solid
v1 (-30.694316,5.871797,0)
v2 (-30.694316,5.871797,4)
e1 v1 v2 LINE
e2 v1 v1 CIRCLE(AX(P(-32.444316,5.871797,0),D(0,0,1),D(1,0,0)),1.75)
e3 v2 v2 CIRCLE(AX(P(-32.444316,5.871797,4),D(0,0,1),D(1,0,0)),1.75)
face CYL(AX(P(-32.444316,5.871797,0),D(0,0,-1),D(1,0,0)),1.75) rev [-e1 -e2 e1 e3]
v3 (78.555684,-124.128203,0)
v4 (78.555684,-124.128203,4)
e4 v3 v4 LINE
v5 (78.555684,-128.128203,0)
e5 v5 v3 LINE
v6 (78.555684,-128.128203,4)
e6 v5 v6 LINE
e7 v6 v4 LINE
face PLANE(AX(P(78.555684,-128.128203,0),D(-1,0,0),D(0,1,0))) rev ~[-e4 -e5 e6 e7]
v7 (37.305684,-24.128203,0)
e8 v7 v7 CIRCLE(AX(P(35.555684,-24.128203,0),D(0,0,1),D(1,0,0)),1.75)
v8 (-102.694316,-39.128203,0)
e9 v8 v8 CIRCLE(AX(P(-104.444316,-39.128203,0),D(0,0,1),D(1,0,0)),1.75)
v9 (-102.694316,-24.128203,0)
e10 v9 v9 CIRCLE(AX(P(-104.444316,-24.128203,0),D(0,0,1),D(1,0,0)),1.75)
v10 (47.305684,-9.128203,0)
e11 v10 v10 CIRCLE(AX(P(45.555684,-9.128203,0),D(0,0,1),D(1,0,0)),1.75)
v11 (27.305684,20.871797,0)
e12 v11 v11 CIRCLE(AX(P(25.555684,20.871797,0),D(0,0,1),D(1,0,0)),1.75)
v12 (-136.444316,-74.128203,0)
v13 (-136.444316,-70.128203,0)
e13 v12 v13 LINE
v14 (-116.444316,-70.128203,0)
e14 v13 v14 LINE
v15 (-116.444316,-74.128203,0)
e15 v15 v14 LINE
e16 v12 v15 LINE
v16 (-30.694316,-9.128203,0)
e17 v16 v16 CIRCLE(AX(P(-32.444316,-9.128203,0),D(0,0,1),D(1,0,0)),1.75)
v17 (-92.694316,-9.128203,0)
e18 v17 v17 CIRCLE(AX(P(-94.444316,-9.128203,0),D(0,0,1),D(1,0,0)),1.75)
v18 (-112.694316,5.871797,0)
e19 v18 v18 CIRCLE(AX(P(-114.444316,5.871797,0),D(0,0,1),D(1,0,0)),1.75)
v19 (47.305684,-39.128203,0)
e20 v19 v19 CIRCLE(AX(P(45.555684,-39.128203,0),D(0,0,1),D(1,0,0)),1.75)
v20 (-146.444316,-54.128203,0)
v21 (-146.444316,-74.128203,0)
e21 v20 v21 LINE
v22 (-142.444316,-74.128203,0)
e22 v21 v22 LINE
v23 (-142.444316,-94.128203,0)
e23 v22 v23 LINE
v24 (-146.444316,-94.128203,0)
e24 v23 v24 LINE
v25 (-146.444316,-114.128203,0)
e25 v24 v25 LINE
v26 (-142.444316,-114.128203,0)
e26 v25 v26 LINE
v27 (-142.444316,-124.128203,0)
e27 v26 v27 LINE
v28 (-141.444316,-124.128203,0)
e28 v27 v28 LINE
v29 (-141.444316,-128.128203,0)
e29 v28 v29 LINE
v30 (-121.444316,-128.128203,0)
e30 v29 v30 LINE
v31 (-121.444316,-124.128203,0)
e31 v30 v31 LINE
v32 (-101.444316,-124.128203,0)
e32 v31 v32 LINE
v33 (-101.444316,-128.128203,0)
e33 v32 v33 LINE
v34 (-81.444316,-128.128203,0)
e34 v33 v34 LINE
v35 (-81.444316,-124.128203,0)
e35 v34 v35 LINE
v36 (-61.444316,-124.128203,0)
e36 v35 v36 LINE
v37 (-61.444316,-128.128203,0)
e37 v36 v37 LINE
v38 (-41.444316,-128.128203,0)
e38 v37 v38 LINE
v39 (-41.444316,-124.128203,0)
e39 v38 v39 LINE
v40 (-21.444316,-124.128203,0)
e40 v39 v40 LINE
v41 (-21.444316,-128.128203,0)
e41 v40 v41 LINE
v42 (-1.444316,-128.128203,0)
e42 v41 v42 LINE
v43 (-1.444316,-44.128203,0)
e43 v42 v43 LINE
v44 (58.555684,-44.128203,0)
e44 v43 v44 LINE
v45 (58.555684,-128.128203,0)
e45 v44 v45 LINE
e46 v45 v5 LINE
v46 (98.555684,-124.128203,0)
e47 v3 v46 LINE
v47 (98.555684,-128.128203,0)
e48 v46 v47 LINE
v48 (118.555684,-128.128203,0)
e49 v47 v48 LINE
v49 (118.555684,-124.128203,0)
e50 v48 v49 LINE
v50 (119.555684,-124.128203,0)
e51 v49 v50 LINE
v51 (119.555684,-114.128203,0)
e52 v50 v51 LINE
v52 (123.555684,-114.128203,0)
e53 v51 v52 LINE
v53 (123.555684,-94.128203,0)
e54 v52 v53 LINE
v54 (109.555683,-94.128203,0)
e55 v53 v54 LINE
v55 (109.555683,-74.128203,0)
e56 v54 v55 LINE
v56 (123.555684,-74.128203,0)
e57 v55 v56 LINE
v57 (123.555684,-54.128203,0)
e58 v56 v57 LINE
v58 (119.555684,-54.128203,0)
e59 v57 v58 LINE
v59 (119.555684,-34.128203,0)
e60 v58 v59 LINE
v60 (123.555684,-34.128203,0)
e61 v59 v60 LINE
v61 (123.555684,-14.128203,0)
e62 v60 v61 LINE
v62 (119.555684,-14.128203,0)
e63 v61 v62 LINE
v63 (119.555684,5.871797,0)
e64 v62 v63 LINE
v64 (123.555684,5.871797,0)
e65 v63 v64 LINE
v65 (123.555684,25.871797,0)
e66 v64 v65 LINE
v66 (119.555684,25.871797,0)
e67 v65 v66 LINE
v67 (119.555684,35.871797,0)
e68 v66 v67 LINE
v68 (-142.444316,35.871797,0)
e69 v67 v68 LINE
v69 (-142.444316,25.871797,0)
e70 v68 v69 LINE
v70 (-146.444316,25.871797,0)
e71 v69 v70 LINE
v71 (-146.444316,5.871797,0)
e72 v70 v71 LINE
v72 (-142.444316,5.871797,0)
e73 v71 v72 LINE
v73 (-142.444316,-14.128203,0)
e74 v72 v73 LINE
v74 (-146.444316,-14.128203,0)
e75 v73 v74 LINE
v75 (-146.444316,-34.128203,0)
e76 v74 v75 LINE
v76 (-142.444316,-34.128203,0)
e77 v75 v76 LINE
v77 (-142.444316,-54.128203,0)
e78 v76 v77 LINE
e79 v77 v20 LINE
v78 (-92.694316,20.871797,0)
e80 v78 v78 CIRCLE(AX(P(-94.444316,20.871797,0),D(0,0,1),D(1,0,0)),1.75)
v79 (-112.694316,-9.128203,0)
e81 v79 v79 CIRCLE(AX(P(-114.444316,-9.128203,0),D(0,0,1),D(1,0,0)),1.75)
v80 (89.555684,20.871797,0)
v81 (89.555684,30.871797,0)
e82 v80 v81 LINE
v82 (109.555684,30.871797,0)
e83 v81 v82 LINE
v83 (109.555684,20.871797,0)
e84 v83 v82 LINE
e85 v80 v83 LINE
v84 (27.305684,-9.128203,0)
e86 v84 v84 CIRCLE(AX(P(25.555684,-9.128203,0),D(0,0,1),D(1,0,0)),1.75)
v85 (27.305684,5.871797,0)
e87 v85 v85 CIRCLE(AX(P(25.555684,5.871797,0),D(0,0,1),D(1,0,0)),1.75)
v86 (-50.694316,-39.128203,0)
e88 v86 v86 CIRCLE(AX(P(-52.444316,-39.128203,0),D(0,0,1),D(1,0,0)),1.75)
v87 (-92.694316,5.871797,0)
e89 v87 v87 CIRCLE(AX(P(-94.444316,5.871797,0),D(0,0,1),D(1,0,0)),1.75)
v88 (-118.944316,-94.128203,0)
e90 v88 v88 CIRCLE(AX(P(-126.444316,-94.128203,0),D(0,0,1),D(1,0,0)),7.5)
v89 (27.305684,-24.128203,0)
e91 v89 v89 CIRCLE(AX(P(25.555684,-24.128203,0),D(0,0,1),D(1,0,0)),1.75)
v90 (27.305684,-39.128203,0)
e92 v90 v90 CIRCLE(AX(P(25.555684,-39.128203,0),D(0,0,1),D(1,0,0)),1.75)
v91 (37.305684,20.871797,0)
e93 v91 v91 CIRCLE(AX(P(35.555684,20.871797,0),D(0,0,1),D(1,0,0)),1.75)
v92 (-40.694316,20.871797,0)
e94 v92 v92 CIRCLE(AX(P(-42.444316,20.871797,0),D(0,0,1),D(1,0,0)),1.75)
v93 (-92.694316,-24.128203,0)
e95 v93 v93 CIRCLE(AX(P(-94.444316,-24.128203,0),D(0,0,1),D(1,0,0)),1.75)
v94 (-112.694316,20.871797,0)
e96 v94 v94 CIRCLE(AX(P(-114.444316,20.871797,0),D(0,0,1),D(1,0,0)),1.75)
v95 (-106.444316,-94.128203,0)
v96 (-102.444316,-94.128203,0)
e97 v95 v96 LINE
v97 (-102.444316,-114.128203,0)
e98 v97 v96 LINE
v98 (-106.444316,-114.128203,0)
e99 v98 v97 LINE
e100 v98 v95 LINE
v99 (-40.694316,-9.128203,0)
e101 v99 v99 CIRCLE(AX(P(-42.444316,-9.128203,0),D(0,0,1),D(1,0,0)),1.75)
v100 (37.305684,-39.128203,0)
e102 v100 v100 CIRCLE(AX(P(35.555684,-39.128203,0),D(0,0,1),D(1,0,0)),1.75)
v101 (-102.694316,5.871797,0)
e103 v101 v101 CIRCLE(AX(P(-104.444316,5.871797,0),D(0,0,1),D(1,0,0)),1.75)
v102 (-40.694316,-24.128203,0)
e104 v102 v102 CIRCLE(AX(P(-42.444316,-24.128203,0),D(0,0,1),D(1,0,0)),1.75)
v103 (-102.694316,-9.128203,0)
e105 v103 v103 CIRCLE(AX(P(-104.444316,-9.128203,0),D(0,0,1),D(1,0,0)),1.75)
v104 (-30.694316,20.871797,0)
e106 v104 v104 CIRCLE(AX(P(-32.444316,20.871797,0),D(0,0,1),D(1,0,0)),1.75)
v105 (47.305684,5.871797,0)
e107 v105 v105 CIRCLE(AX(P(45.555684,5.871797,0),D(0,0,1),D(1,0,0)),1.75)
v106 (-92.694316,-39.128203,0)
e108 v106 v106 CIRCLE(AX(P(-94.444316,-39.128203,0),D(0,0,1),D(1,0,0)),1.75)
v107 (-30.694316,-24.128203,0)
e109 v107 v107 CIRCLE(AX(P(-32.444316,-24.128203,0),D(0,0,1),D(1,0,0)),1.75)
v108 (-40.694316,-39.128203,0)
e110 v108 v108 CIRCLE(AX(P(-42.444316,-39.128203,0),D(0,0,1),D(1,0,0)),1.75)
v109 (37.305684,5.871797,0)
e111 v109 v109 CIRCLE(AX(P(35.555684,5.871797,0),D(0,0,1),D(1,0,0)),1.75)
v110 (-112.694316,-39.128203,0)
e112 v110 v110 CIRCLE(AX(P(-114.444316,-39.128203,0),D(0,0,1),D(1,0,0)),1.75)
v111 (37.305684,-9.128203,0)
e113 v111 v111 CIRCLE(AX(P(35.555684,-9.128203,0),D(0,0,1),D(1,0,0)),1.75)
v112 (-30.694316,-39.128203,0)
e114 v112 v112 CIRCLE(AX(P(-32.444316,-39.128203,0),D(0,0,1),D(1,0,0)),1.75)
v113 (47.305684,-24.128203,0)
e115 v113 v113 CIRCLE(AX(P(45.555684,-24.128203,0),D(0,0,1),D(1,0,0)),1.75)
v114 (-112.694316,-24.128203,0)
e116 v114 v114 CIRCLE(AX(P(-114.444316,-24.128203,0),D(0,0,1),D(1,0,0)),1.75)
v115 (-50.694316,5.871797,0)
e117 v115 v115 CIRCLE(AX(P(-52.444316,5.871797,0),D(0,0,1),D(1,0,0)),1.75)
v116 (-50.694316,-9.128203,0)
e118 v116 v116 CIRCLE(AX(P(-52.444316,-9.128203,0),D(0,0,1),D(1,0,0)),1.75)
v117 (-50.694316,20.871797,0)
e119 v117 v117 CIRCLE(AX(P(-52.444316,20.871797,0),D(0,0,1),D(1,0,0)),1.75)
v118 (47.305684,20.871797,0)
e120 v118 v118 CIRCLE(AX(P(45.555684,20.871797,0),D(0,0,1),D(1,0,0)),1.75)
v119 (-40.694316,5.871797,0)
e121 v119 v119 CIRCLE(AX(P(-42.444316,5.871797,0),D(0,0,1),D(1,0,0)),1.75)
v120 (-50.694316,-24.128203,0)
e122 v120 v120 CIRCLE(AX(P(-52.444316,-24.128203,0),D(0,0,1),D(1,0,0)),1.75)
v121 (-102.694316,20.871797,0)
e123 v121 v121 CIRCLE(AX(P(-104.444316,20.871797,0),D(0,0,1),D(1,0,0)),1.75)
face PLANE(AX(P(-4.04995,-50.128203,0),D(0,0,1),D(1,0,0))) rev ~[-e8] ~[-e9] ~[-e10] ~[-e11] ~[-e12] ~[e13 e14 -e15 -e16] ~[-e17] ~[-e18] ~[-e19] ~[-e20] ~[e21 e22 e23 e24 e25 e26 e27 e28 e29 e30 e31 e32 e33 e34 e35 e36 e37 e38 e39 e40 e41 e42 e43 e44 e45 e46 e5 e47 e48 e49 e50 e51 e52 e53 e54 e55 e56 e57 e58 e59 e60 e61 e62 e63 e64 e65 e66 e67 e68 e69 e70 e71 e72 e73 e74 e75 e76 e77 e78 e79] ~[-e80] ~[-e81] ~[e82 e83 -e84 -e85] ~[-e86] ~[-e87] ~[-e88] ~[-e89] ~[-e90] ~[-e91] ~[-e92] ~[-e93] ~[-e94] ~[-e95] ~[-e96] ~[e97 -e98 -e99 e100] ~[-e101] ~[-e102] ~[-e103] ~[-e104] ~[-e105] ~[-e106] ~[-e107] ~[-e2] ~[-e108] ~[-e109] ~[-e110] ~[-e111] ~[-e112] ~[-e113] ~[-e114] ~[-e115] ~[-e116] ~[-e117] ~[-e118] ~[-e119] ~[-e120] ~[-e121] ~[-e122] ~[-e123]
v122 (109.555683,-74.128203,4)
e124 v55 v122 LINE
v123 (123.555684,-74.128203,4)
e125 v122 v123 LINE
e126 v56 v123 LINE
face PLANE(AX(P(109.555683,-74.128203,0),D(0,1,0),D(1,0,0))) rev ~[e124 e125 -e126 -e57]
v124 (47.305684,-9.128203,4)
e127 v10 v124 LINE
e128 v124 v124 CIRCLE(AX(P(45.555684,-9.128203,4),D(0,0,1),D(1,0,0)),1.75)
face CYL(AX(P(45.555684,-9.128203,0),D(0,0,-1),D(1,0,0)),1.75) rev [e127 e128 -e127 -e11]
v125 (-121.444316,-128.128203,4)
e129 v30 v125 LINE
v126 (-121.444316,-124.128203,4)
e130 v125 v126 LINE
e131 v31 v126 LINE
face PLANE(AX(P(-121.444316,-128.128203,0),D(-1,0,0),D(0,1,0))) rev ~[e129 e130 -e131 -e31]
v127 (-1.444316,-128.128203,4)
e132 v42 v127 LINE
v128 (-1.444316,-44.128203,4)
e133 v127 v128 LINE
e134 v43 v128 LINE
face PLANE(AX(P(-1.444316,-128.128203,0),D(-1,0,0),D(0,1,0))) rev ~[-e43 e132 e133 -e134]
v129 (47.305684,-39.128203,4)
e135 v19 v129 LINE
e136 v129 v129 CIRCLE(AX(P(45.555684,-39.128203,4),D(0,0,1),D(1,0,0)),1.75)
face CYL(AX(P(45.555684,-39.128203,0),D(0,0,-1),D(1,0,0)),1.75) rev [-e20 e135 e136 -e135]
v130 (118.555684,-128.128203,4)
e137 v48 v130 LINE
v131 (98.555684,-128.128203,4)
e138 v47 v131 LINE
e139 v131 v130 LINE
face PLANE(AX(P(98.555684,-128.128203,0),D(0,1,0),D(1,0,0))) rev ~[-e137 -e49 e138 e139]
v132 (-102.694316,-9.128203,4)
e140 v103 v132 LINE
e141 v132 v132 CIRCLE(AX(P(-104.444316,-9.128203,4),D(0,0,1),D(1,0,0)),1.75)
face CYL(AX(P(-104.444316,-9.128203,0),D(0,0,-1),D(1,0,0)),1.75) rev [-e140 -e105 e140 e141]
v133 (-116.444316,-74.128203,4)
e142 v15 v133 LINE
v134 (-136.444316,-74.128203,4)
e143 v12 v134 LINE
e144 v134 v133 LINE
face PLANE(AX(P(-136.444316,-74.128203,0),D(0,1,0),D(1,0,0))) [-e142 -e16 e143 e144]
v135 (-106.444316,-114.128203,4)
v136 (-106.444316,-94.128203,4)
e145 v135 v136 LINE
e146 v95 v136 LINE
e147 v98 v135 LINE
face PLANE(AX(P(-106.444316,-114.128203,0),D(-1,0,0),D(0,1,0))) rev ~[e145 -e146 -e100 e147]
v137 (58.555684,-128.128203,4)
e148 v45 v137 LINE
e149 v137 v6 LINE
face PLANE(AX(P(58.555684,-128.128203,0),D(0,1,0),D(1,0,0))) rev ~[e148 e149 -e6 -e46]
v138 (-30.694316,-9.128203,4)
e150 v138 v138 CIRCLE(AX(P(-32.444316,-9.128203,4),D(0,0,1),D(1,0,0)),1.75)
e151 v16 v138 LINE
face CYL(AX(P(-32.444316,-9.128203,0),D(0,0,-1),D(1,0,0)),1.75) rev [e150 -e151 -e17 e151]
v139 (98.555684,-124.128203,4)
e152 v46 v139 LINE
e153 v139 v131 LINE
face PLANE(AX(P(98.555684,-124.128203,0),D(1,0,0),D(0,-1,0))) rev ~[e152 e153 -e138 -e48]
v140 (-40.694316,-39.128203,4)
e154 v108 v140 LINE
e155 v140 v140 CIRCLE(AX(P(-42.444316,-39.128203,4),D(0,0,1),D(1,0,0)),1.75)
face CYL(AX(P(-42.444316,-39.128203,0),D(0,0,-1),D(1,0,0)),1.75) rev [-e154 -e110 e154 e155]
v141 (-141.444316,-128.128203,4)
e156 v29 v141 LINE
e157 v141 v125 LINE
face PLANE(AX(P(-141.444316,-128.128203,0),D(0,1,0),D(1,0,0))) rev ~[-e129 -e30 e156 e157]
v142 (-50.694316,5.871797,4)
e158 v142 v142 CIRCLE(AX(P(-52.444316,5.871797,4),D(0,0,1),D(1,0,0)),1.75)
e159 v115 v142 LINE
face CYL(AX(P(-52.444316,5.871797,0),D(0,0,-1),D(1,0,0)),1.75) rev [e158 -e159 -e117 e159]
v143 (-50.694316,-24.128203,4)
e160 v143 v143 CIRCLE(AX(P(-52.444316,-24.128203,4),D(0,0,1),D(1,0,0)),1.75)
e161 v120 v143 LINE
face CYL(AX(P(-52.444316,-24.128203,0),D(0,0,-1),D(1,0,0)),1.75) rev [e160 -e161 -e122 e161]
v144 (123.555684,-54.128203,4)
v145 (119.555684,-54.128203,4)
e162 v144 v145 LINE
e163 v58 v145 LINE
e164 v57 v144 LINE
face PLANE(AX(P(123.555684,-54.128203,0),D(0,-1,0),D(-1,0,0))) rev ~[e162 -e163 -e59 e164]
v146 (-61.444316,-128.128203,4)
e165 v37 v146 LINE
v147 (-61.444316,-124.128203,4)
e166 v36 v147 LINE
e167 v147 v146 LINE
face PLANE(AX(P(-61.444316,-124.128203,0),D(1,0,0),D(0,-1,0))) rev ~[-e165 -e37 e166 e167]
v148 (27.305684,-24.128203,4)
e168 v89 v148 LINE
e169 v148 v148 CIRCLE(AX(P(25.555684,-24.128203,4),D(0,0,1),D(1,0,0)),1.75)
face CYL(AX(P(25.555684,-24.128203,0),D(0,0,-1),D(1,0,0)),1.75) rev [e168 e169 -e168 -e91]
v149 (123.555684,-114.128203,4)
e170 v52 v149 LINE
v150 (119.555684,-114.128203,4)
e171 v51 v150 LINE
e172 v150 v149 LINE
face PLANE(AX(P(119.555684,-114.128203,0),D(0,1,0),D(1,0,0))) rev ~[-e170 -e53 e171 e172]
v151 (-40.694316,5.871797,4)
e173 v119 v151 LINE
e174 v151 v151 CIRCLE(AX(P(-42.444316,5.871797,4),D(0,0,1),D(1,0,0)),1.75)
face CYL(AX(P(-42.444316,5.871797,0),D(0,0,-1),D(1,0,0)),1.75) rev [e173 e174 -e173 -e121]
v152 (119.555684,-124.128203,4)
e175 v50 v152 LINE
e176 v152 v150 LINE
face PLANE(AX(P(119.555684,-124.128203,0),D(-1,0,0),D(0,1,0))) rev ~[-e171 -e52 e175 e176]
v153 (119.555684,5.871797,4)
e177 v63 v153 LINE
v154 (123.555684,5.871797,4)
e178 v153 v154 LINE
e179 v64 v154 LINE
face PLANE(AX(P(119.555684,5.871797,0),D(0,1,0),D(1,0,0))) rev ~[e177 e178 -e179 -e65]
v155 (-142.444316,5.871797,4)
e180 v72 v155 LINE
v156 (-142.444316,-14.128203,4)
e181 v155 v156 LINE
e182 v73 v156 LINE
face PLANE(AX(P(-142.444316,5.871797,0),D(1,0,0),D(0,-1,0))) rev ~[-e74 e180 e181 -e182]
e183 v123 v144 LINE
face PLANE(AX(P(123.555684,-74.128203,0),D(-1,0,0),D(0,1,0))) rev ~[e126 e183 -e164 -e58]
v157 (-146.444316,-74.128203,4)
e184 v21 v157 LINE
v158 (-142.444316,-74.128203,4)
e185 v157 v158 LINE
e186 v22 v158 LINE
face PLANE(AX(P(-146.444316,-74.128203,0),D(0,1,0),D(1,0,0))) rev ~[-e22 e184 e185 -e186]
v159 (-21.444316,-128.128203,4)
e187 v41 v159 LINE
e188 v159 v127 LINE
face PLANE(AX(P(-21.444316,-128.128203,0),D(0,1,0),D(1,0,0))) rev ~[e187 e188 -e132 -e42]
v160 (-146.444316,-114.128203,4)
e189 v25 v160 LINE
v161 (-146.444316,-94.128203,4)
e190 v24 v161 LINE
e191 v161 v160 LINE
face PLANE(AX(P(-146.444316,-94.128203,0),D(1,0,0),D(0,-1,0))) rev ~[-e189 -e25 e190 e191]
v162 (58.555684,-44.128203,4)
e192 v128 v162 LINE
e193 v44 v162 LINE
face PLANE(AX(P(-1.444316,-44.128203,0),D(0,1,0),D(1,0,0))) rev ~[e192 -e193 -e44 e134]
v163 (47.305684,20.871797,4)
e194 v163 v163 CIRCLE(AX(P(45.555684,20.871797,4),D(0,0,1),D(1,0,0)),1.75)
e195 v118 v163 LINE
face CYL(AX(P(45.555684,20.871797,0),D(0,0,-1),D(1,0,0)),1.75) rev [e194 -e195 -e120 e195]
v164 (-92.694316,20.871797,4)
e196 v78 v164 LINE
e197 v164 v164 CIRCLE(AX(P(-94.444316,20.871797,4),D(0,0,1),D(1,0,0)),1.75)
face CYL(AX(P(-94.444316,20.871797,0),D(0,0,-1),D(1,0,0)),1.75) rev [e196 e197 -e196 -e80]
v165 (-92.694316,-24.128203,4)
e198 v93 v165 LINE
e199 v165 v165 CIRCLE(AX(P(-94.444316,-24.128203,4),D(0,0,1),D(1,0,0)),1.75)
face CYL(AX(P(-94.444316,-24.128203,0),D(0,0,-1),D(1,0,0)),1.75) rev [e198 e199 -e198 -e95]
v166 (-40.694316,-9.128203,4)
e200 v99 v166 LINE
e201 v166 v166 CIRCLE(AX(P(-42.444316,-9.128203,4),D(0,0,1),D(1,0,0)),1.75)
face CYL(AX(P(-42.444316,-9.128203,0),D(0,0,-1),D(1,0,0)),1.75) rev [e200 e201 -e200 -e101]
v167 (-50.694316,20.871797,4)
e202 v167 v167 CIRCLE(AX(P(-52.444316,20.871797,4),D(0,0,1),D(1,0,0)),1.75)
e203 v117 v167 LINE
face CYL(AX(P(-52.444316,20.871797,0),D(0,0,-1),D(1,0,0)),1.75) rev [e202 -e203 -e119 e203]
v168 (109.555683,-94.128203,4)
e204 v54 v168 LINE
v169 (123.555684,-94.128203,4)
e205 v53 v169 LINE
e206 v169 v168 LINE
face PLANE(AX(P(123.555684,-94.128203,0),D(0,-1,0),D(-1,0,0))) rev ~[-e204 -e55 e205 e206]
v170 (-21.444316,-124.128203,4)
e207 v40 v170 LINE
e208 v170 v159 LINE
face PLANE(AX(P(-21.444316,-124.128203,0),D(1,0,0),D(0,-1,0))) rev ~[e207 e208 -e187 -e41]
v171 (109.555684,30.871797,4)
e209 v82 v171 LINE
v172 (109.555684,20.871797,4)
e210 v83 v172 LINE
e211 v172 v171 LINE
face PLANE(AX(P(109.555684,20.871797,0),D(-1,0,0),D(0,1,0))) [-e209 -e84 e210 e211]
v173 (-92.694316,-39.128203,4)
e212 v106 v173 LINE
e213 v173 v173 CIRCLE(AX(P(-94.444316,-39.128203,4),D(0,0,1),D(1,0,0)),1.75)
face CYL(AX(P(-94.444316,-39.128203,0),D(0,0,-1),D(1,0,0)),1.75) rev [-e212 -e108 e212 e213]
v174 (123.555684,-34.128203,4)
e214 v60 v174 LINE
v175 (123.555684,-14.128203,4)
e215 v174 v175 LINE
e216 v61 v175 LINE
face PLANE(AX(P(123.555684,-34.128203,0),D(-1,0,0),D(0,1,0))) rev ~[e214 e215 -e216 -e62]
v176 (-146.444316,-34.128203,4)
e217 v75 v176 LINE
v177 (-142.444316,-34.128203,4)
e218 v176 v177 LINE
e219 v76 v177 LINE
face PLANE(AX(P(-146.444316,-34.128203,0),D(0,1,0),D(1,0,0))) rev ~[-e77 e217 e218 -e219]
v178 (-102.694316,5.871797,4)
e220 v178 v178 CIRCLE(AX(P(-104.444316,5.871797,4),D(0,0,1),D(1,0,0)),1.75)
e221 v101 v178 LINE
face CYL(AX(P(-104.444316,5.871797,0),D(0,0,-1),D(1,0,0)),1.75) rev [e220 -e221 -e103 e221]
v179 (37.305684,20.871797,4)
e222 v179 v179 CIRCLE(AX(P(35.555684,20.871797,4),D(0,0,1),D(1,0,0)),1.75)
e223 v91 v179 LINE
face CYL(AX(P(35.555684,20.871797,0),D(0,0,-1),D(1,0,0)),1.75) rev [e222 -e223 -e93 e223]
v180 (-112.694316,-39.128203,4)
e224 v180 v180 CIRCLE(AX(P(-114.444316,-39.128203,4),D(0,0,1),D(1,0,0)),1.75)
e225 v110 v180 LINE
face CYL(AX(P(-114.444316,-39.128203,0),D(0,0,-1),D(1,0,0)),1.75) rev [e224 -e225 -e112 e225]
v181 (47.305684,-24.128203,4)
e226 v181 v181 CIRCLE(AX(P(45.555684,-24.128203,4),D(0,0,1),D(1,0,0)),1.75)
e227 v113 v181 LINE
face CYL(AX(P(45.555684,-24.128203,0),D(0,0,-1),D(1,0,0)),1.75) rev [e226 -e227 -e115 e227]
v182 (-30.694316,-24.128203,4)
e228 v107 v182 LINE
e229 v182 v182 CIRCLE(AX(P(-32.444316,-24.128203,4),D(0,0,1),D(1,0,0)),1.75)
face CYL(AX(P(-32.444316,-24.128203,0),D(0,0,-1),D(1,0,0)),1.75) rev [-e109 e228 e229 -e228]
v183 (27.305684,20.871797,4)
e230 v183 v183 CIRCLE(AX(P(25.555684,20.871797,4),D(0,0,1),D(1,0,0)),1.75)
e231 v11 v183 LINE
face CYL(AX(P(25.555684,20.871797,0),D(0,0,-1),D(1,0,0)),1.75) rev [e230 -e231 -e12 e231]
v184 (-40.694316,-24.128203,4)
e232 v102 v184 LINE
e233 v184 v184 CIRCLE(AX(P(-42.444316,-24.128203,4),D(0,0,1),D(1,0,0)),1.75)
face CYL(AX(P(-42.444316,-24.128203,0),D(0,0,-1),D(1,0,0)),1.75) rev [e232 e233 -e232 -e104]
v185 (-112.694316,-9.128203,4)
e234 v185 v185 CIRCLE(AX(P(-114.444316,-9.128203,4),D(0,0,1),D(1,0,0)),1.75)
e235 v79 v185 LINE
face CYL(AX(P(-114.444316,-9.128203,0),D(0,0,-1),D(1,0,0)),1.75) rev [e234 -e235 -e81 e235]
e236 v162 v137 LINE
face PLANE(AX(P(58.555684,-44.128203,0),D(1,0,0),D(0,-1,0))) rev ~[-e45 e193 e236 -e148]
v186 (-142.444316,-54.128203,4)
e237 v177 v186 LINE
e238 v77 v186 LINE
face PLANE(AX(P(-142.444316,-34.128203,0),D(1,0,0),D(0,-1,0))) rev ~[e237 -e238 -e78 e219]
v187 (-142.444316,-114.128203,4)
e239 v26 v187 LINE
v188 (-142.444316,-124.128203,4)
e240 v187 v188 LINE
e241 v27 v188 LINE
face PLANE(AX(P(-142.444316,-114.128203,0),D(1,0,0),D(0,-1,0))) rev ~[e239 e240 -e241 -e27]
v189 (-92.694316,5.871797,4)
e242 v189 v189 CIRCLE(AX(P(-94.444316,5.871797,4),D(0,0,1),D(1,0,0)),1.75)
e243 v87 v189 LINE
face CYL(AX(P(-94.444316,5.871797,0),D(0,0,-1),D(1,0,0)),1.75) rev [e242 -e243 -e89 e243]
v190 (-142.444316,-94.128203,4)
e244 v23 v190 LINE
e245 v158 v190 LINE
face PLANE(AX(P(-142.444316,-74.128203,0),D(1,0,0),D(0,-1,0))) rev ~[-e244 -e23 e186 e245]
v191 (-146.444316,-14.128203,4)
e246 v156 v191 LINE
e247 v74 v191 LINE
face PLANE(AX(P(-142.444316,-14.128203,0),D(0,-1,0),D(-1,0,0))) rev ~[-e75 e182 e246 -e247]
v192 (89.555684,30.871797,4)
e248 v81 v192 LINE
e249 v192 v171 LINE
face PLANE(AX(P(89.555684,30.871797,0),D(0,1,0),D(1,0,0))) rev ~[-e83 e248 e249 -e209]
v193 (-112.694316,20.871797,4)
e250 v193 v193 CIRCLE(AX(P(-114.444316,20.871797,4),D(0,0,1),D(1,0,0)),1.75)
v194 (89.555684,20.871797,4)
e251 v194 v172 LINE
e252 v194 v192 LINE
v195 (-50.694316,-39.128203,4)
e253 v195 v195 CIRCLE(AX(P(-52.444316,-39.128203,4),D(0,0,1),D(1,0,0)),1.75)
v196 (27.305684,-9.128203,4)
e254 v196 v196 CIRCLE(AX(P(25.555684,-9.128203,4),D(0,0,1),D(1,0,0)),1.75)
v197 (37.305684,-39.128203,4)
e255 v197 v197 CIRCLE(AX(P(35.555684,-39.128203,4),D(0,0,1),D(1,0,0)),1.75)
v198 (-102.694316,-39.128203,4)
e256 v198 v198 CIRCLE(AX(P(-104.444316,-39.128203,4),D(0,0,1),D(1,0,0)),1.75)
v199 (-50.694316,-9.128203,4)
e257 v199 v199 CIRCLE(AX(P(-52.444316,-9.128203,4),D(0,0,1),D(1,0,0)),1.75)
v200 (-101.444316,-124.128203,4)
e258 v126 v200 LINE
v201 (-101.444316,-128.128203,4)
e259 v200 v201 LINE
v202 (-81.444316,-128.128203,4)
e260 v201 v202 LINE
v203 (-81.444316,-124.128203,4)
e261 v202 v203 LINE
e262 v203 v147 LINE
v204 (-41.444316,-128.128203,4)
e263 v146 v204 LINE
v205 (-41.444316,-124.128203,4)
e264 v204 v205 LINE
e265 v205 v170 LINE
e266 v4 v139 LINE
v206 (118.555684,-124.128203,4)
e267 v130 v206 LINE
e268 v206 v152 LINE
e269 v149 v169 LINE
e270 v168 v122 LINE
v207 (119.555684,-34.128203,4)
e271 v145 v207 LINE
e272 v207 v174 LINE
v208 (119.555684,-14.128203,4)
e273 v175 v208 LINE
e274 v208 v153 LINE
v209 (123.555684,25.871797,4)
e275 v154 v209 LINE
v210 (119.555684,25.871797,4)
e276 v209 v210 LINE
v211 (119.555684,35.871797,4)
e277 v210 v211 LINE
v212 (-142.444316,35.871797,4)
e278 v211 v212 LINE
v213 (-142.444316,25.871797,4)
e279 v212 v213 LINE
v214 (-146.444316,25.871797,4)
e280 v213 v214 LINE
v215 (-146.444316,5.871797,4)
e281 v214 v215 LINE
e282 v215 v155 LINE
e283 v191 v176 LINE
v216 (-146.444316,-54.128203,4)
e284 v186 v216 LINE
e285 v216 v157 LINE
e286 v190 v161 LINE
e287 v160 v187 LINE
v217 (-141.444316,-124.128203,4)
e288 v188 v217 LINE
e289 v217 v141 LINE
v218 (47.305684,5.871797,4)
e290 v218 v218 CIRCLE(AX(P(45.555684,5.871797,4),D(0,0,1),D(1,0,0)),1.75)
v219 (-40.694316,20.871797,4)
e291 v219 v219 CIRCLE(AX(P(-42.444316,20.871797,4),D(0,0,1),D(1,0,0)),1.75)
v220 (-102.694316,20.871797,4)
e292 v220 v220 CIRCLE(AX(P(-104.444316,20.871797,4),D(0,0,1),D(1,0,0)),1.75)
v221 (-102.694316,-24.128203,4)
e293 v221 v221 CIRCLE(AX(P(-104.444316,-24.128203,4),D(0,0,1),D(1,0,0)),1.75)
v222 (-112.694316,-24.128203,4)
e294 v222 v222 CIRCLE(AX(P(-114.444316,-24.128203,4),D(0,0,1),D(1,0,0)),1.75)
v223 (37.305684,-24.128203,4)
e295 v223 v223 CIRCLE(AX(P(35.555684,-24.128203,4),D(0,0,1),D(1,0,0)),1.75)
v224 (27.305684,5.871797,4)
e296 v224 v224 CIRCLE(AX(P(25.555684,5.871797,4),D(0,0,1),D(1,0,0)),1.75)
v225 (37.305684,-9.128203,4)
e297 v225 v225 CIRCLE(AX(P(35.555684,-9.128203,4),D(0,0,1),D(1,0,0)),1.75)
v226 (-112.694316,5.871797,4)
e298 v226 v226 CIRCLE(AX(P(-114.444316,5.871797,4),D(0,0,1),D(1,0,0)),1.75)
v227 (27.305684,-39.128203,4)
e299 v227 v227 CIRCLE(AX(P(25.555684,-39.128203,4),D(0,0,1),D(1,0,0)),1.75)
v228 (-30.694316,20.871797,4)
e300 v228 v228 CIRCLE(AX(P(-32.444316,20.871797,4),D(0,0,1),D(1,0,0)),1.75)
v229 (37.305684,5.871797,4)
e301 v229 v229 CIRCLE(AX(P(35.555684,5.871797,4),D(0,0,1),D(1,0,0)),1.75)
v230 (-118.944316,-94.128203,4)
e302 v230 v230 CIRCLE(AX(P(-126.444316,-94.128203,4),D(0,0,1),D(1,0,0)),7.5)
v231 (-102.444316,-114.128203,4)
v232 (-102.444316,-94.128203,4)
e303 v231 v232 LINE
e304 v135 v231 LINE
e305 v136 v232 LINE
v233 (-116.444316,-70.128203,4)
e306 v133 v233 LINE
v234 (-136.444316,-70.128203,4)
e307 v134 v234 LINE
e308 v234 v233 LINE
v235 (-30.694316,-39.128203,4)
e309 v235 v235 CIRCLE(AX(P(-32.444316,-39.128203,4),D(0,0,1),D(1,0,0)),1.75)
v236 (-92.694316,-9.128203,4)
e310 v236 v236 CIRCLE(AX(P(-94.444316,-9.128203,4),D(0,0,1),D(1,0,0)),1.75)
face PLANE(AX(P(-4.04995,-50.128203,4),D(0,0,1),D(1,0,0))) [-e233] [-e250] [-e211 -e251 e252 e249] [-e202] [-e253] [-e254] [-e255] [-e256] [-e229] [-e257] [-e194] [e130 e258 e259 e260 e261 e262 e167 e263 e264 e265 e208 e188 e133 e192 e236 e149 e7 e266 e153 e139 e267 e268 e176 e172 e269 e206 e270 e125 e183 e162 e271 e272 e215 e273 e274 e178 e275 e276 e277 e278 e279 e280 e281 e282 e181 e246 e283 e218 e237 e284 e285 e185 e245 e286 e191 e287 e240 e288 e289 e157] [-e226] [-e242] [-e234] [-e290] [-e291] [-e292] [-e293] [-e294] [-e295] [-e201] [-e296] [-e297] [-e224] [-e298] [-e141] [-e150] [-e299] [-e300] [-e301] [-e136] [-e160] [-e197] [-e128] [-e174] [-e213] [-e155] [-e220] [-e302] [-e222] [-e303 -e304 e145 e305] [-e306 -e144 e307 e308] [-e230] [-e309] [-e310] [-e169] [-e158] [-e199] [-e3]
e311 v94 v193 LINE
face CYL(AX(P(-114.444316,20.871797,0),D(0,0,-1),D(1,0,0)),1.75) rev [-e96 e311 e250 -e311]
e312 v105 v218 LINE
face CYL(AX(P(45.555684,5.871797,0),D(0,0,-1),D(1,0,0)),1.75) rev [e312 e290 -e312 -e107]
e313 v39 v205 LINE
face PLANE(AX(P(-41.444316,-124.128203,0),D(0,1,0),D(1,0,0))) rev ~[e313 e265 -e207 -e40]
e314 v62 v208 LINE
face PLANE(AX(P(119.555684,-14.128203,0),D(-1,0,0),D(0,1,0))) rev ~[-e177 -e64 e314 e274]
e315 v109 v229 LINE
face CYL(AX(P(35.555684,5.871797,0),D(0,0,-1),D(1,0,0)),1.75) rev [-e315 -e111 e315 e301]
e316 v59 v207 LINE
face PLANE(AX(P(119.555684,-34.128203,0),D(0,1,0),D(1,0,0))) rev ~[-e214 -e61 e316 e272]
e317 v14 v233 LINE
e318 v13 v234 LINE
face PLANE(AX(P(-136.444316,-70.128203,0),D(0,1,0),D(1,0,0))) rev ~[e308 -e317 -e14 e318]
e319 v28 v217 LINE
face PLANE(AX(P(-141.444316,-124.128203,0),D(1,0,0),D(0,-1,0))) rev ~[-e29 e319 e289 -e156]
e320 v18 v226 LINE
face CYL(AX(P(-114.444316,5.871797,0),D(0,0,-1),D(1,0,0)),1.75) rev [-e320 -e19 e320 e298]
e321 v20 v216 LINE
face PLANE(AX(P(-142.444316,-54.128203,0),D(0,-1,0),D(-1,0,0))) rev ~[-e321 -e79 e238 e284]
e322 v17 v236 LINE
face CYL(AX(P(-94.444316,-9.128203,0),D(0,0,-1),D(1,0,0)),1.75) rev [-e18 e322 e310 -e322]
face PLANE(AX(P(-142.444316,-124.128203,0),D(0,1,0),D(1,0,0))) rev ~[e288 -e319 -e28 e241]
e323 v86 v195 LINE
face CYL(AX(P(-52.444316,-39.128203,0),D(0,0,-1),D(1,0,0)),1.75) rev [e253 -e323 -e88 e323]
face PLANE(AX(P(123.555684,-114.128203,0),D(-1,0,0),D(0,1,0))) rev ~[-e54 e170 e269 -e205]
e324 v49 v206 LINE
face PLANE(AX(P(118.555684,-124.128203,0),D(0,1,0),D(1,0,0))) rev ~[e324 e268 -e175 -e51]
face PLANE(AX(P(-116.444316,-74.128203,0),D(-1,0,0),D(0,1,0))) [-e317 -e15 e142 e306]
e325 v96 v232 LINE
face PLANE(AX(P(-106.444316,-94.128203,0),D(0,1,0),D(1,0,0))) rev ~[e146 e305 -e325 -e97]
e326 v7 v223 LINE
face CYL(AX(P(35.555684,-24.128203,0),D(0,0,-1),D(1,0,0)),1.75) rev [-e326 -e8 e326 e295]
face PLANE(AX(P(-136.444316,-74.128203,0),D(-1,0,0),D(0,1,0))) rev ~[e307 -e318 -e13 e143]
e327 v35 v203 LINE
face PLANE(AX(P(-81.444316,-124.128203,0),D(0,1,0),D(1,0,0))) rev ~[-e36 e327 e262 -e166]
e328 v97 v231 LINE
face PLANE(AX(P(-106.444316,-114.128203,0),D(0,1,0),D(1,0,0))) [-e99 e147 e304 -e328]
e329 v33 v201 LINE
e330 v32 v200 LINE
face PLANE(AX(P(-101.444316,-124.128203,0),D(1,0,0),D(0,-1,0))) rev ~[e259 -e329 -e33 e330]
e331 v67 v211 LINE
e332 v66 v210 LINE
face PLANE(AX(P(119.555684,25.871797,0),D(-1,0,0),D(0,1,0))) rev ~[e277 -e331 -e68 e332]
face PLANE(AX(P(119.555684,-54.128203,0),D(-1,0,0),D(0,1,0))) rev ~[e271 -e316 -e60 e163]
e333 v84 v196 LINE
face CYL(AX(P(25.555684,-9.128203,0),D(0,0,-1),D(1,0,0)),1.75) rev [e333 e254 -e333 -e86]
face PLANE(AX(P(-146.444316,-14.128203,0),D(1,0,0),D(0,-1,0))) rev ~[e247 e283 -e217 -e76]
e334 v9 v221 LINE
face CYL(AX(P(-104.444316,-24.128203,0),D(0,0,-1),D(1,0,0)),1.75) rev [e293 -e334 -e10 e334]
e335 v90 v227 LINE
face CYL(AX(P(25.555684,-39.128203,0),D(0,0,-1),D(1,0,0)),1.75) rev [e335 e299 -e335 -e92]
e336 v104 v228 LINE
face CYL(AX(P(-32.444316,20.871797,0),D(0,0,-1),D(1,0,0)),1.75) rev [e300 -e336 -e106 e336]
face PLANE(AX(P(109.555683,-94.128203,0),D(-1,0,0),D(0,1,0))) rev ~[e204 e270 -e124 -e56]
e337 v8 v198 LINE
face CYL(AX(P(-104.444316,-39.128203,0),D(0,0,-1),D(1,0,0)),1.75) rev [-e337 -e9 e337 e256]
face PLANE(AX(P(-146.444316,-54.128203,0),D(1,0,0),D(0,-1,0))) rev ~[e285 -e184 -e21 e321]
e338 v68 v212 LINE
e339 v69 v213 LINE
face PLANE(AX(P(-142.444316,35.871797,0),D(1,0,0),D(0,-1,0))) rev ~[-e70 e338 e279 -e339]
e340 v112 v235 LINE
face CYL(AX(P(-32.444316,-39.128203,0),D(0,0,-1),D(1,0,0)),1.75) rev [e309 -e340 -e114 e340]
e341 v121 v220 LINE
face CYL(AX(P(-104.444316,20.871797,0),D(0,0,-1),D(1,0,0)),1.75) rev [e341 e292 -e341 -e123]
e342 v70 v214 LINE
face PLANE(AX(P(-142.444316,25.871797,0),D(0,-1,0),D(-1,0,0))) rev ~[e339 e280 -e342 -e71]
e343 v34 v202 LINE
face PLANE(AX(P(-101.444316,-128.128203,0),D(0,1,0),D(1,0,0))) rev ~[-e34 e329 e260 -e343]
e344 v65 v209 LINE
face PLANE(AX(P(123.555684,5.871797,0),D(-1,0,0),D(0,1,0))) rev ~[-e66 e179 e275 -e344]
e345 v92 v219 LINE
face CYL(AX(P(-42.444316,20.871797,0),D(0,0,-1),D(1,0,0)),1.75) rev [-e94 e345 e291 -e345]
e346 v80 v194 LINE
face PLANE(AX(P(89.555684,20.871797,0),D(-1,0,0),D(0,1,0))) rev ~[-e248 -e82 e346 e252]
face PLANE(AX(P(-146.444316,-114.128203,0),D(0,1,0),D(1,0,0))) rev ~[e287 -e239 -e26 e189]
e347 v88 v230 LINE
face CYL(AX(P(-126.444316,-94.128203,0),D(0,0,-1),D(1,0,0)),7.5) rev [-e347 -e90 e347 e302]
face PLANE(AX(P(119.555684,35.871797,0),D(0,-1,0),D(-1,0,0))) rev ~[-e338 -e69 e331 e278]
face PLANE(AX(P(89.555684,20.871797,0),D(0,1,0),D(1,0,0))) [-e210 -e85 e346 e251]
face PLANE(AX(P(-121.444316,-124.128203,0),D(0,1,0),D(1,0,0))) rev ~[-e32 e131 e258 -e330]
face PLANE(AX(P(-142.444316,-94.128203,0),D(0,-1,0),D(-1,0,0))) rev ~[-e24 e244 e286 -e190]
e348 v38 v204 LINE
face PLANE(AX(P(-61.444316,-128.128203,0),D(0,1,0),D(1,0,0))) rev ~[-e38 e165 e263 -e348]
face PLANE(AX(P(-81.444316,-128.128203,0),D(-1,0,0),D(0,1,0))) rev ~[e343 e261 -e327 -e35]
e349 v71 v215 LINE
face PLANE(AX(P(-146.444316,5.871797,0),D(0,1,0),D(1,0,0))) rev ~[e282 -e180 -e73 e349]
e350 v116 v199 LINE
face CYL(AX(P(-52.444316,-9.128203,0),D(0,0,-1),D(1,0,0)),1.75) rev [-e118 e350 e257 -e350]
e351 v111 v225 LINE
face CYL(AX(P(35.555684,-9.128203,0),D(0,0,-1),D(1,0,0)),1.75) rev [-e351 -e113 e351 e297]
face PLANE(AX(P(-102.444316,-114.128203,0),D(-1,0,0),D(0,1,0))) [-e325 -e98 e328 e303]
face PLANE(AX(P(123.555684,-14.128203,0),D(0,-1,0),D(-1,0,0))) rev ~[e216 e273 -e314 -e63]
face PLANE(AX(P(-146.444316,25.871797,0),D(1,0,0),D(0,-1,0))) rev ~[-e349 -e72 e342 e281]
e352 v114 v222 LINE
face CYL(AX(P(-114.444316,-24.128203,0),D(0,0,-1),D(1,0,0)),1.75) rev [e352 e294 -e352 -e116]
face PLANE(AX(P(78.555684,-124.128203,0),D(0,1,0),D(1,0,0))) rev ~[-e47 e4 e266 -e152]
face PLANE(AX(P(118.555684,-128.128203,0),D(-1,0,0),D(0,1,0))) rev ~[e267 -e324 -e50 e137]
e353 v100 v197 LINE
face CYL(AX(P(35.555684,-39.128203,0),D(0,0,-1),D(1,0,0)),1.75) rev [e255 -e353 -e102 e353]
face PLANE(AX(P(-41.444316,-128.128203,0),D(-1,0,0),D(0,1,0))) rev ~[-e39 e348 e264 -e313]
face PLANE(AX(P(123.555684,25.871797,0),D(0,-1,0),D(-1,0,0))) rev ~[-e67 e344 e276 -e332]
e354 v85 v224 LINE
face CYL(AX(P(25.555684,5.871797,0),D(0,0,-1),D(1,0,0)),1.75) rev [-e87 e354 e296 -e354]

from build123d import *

# Parameters (mm, degrees)
F0_R     = 7.5
F0_W     = 4
F0_H     = 20
F0_W_2   = 20
F0_H_2   = 4
F0_R_2   = 1.75
F0_H_3   = 10
F1_DEPTH = 4


# Not quite as in the source:
# - ends of sketch curves that miss each other by under 0.0002 mm in the source are joined


with BuildPart() as f1:
    # F0 (on Top) → F1 (new body)
    with BuildSketch(Plane.XY):
        Polygon((-21.444316276, -128.1282028952), (-1.444316276, -128.1282028952), (-1.444316276, -124.1282028952), (-1.444316276, -44.1282028952), (58.555683724, -44.1282028952), (58.555683724, -124.1282028952), (58.555683724, -128.1282028952), (78.555683724, -128.1282028952), (78.555683724, -124.1282028952), (98.555683724, -124.1282028952), (98.555683724, -128.1282028952), (118.555683724, -128.1282028952), (118.555683724, -124.1282028952), (119.555683724, -124.1282028952), (119.555683724, -114.1282028952), (123.555683724, -114.1282028952), (123.5556837228, -94.1282028952), (119.5556837228, -94.1282028952), (109.5556834554, -94.1282028952), (109.5556834554, -74.1282028952), (119.5556834554, -74.1282028952), (123.555683724, -74.1282028952), (123.5556837228, -54.1282028952), (119.5556837228, -54.1282028952), (119.5556837242, -34.1282028952), (123.555683724, -34.1282028952), (123.5556837228, -14.1282028952), (119.5556837228, -14.1282028952), (119.5556837242, 5.8717971048), (123.555683724, 5.8717971048), (123.5556837228, 25.8717971048), (119.5556837228, 25.8717971048), (119.555683724, 35.8717971048), (-142.444316276, 35.8717971048), (-142.4443162747, 25.8717971048), (-146.4443162747, 25.8717971048), (-146.444316276, 5.8717971048), (-142.444316276, 5.8717971048), (-142.4443162747, -14.1282028952), (-146.4443162747, -14.1282028952), (-146.444316276, -34.1282028952), (-142.444316276, -34.1282028952), (-142.4443162747, -54.1282028952), (-146.4443162747, -54.1282028952), (-146.444316276, -74.1282028952), (-142.444316276, -74.1282028952), (-142.4443162747, -94.1282028952), (-146.4443162747, -94.1282028952), (-146.444316276, -114.1282028952), (-142.444316276, -114.1282028952), (-142.444316276, -124.1282028952), (-141.444316276, -124.1282028952), (-141.444316276, -128.1282028952), (-121.444316276, -128.1282028952), (-121.444316276, -124.1282028952), (-101.444316276, -124.1282028952), (-101.444316276, -128.1282028952), (-81.444316276, -128.1282028952), (-81.444316276, -124.1282028952), (-61.444316276, -124.1282028952), (-61.444316276, -128.1282028952), (-41.444316276, -128.1282028952), (-41.444316276, -124.1282028952), (-21.444316276, -124.1282028952), align=None)
        with Locations((-126.4443162747, -94.1282028952)):
            Circle(F0_R, mode=Mode.SUBTRACT)
        with Locations((-104.4443162747, -104.1282028952)):
            Rectangle(F0_W, F0_H, mode=Mode.SUBTRACT)
        with Locations((-126.4443162747, -72.1282028948)):
            Rectangle(F0_W_2, F0_H_2, mode=Mode.SUBTRACT)
        with Locations((-114.444316276, -39.1282028952)):
            Circle(F0_R_2, mode=Mode.SUBTRACT)
        with Locations((-104.444316276, -39.1282028952)):
            Circle(F0_R_2, mode=Mode.SUBTRACT)
        with Locations((-94.444316276, -39.1282028952)):
            Circle(F0_R_2, mode=Mode.SUBTRACT)
        with Locations((-114.444316276, -24.1282028952)):
            Circle(F0_R_2, mode=Mode.SUBTRACT)
        with Locations((-114.444316276, -9.1282028952)):
            Circle(F0_R_2, mode=Mode.SUBTRACT)
        with Locations((-104.444316276, -24.1282028952)):
            Circle(F0_R_2, mode=Mode.SUBTRACT)
        with Locations((-94.444316276, -24.1282028952)):
            Circle(F0_R_2, mode=Mode.SUBTRACT)
        with Locations((-104.444316276, -9.1282028952)):
            Circle(F0_R_2, mode=Mode.SUBTRACT)
        with Locations((-94.444316276, -9.1282028952)):
            Circle(F0_R_2, mode=Mode.SUBTRACT)
        with Locations((-52.444316276, -39.1282028952)):
            Circle(F0_R_2, mode=Mode.SUBTRACT)
        with Locations((-42.444316276, -39.1282028952)):
            Circle(F0_R_2, mode=Mode.SUBTRACT)
        with Locations((-32.444316276, -39.1282028952)):
            Circle(F0_R_2, mode=Mode.SUBTRACT)
        with Locations((-52.444316276, -24.1282028952)):
            Circle(F0_R_2, mode=Mode.SUBTRACT)
        with Locations((-52.444316276, -9.1282028952)):
            Circle(F0_R_2, mode=Mode.SUBTRACT)
        with Locations((-42.444316276, -24.1282028952)):
            Circle(F0_R_2, mode=Mode.SUBTRACT)
        with Locations((-32.444316276, -24.1282028952)):
            Circle(F0_R_2, mode=Mode.SUBTRACT)
        with Locations((-42.444316276, -9.1282028952)):
            Circle(F0_R_2, mode=Mode.SUBTRACT)
        with Locations((-32.444316276, -9.1282028952)):
            Circle(F0_R_2, mode=Mode.SUBTRACT)
        with Locations((-114.444316276, 5.8717971048)):
            Circle(F0_R_2, mode=Mode.SUBTRACT)
        with Locations((-104.444316276, 5.8717971048)):
            Circle(F0_R_2, mode=Mode.SUBTRACT)
        with Locations((-94.444316276, 5.8717971048)):
            Circle(F0_R_2, mode=Mode.SUBTRACT)
        with Locations((-114.444316276, 20.8717971048)):
            Circle(F0_R_2, mode=Mode.SUBTRACT)
        with Locations((-104.444316276, 20.8717971048)):
            Circle(F0_R_2, mode=Mode.SUBTRACT)
        with Locations((-94.444316276, 20.8717971048)):
            Circle(F0_R_2, mode=Mode.SUBTRACT)
        with Locations((-52.444316276, 5.8717971048)):
            Circle(F0_R_2, mode=Mode.SUBTRACT)
        with Locations((-42.444316276, 5.8717971048)):
            Circle(F0_R_2, mode=Mode.SUBTRACT)
        with Locations((-32.444316276, 5.8717971048)):
            Circle(F0_R_2, mode=Mode.SUBTRACT)
        with Locations((-52.444316276, 20.8717971048)):
            Circle(F0_R_2, mode=Mode.SUBTRACT)
        with Locations((-42.444316276, 20.8717971048)):
            Circle(F0_R_2, mode=Mode.SUBTRACT)
        with Locations((-32.444316276, 20.8717971048)):
            Circle(F0_R_2, mode=Mode.SUBTRACT)
        with Locations((25.555683724, -39.1282028952)):
            Circle(F0_R_2, mode=Mode.SUBTRACT)
        with Locations((35.555683724, -39.1282028952)):
            Circle(F0_R_2, mode=Mode.SUBTRACT)
        with Locations((45.555683724, -39.1282028952)):
            Circle(F0_R_2, mode=Mode.SUBTRACT)
        with Locations((25.555683724, -24.1282028952)):
            Circle(F0_R_2, mode=Mode.SUBTRACT)
        with Locations((35.555683724, -24.1282028952)):
            Circle(F0_R_2, mode=Mode.SUBTRACT)
        with Locations((45.555683724, -24.1282028952)):
            Circle(F0_R_2, mode=Mode.SUBTRACT)
        with Locations((25.555683724, -9.1282028952)):
            Circle(F0_R_2, mode=Mode.SUBTRACT)
        with Locations((35.555683724, -9.1282028952)):
            Circle(F0_R_2, mode=Mode.SUBTRACT)
        with Locations((45.555683724, -9.1282028952)):
            Circle(F0_R_2, mode=Mode.SUBTRACT)
        with Locations((25.555683724, 5.8717971048)):
            Circle(F0_R_2, mode=Mode.SUBTRACT)
        with Locations((35.555683724, 5.8717971048)):
            Circle(F0_R_2, mode=Mode.SUBTRACT)
        with Locations((45.555683724, 5.8717971048)):
            Circle(F0_R_2, mode=Mode.SUBTRACT)
        with Locations((25.555683724, 20.8717971048)):
            Circle(F0_R_2, mode=Mode.SUBTRACT)
        with Locations((35.555683724, 20.8717971048)):
            Circle(F0_R_2, mode=Mode.SUBTRACT)
        with Locations((45.555683724, 20.8717971048)):
            Circle(F0_R_2, mode=Mode.SUBTRACT)
        with Locations((99.555683724, 25.8717971048)):
            Rectangle(F0_W_2, F0_H_3, mode=Mode.SUBTRACT)
    extrude(amount=F1_DEPTH)


solid = f1.part
